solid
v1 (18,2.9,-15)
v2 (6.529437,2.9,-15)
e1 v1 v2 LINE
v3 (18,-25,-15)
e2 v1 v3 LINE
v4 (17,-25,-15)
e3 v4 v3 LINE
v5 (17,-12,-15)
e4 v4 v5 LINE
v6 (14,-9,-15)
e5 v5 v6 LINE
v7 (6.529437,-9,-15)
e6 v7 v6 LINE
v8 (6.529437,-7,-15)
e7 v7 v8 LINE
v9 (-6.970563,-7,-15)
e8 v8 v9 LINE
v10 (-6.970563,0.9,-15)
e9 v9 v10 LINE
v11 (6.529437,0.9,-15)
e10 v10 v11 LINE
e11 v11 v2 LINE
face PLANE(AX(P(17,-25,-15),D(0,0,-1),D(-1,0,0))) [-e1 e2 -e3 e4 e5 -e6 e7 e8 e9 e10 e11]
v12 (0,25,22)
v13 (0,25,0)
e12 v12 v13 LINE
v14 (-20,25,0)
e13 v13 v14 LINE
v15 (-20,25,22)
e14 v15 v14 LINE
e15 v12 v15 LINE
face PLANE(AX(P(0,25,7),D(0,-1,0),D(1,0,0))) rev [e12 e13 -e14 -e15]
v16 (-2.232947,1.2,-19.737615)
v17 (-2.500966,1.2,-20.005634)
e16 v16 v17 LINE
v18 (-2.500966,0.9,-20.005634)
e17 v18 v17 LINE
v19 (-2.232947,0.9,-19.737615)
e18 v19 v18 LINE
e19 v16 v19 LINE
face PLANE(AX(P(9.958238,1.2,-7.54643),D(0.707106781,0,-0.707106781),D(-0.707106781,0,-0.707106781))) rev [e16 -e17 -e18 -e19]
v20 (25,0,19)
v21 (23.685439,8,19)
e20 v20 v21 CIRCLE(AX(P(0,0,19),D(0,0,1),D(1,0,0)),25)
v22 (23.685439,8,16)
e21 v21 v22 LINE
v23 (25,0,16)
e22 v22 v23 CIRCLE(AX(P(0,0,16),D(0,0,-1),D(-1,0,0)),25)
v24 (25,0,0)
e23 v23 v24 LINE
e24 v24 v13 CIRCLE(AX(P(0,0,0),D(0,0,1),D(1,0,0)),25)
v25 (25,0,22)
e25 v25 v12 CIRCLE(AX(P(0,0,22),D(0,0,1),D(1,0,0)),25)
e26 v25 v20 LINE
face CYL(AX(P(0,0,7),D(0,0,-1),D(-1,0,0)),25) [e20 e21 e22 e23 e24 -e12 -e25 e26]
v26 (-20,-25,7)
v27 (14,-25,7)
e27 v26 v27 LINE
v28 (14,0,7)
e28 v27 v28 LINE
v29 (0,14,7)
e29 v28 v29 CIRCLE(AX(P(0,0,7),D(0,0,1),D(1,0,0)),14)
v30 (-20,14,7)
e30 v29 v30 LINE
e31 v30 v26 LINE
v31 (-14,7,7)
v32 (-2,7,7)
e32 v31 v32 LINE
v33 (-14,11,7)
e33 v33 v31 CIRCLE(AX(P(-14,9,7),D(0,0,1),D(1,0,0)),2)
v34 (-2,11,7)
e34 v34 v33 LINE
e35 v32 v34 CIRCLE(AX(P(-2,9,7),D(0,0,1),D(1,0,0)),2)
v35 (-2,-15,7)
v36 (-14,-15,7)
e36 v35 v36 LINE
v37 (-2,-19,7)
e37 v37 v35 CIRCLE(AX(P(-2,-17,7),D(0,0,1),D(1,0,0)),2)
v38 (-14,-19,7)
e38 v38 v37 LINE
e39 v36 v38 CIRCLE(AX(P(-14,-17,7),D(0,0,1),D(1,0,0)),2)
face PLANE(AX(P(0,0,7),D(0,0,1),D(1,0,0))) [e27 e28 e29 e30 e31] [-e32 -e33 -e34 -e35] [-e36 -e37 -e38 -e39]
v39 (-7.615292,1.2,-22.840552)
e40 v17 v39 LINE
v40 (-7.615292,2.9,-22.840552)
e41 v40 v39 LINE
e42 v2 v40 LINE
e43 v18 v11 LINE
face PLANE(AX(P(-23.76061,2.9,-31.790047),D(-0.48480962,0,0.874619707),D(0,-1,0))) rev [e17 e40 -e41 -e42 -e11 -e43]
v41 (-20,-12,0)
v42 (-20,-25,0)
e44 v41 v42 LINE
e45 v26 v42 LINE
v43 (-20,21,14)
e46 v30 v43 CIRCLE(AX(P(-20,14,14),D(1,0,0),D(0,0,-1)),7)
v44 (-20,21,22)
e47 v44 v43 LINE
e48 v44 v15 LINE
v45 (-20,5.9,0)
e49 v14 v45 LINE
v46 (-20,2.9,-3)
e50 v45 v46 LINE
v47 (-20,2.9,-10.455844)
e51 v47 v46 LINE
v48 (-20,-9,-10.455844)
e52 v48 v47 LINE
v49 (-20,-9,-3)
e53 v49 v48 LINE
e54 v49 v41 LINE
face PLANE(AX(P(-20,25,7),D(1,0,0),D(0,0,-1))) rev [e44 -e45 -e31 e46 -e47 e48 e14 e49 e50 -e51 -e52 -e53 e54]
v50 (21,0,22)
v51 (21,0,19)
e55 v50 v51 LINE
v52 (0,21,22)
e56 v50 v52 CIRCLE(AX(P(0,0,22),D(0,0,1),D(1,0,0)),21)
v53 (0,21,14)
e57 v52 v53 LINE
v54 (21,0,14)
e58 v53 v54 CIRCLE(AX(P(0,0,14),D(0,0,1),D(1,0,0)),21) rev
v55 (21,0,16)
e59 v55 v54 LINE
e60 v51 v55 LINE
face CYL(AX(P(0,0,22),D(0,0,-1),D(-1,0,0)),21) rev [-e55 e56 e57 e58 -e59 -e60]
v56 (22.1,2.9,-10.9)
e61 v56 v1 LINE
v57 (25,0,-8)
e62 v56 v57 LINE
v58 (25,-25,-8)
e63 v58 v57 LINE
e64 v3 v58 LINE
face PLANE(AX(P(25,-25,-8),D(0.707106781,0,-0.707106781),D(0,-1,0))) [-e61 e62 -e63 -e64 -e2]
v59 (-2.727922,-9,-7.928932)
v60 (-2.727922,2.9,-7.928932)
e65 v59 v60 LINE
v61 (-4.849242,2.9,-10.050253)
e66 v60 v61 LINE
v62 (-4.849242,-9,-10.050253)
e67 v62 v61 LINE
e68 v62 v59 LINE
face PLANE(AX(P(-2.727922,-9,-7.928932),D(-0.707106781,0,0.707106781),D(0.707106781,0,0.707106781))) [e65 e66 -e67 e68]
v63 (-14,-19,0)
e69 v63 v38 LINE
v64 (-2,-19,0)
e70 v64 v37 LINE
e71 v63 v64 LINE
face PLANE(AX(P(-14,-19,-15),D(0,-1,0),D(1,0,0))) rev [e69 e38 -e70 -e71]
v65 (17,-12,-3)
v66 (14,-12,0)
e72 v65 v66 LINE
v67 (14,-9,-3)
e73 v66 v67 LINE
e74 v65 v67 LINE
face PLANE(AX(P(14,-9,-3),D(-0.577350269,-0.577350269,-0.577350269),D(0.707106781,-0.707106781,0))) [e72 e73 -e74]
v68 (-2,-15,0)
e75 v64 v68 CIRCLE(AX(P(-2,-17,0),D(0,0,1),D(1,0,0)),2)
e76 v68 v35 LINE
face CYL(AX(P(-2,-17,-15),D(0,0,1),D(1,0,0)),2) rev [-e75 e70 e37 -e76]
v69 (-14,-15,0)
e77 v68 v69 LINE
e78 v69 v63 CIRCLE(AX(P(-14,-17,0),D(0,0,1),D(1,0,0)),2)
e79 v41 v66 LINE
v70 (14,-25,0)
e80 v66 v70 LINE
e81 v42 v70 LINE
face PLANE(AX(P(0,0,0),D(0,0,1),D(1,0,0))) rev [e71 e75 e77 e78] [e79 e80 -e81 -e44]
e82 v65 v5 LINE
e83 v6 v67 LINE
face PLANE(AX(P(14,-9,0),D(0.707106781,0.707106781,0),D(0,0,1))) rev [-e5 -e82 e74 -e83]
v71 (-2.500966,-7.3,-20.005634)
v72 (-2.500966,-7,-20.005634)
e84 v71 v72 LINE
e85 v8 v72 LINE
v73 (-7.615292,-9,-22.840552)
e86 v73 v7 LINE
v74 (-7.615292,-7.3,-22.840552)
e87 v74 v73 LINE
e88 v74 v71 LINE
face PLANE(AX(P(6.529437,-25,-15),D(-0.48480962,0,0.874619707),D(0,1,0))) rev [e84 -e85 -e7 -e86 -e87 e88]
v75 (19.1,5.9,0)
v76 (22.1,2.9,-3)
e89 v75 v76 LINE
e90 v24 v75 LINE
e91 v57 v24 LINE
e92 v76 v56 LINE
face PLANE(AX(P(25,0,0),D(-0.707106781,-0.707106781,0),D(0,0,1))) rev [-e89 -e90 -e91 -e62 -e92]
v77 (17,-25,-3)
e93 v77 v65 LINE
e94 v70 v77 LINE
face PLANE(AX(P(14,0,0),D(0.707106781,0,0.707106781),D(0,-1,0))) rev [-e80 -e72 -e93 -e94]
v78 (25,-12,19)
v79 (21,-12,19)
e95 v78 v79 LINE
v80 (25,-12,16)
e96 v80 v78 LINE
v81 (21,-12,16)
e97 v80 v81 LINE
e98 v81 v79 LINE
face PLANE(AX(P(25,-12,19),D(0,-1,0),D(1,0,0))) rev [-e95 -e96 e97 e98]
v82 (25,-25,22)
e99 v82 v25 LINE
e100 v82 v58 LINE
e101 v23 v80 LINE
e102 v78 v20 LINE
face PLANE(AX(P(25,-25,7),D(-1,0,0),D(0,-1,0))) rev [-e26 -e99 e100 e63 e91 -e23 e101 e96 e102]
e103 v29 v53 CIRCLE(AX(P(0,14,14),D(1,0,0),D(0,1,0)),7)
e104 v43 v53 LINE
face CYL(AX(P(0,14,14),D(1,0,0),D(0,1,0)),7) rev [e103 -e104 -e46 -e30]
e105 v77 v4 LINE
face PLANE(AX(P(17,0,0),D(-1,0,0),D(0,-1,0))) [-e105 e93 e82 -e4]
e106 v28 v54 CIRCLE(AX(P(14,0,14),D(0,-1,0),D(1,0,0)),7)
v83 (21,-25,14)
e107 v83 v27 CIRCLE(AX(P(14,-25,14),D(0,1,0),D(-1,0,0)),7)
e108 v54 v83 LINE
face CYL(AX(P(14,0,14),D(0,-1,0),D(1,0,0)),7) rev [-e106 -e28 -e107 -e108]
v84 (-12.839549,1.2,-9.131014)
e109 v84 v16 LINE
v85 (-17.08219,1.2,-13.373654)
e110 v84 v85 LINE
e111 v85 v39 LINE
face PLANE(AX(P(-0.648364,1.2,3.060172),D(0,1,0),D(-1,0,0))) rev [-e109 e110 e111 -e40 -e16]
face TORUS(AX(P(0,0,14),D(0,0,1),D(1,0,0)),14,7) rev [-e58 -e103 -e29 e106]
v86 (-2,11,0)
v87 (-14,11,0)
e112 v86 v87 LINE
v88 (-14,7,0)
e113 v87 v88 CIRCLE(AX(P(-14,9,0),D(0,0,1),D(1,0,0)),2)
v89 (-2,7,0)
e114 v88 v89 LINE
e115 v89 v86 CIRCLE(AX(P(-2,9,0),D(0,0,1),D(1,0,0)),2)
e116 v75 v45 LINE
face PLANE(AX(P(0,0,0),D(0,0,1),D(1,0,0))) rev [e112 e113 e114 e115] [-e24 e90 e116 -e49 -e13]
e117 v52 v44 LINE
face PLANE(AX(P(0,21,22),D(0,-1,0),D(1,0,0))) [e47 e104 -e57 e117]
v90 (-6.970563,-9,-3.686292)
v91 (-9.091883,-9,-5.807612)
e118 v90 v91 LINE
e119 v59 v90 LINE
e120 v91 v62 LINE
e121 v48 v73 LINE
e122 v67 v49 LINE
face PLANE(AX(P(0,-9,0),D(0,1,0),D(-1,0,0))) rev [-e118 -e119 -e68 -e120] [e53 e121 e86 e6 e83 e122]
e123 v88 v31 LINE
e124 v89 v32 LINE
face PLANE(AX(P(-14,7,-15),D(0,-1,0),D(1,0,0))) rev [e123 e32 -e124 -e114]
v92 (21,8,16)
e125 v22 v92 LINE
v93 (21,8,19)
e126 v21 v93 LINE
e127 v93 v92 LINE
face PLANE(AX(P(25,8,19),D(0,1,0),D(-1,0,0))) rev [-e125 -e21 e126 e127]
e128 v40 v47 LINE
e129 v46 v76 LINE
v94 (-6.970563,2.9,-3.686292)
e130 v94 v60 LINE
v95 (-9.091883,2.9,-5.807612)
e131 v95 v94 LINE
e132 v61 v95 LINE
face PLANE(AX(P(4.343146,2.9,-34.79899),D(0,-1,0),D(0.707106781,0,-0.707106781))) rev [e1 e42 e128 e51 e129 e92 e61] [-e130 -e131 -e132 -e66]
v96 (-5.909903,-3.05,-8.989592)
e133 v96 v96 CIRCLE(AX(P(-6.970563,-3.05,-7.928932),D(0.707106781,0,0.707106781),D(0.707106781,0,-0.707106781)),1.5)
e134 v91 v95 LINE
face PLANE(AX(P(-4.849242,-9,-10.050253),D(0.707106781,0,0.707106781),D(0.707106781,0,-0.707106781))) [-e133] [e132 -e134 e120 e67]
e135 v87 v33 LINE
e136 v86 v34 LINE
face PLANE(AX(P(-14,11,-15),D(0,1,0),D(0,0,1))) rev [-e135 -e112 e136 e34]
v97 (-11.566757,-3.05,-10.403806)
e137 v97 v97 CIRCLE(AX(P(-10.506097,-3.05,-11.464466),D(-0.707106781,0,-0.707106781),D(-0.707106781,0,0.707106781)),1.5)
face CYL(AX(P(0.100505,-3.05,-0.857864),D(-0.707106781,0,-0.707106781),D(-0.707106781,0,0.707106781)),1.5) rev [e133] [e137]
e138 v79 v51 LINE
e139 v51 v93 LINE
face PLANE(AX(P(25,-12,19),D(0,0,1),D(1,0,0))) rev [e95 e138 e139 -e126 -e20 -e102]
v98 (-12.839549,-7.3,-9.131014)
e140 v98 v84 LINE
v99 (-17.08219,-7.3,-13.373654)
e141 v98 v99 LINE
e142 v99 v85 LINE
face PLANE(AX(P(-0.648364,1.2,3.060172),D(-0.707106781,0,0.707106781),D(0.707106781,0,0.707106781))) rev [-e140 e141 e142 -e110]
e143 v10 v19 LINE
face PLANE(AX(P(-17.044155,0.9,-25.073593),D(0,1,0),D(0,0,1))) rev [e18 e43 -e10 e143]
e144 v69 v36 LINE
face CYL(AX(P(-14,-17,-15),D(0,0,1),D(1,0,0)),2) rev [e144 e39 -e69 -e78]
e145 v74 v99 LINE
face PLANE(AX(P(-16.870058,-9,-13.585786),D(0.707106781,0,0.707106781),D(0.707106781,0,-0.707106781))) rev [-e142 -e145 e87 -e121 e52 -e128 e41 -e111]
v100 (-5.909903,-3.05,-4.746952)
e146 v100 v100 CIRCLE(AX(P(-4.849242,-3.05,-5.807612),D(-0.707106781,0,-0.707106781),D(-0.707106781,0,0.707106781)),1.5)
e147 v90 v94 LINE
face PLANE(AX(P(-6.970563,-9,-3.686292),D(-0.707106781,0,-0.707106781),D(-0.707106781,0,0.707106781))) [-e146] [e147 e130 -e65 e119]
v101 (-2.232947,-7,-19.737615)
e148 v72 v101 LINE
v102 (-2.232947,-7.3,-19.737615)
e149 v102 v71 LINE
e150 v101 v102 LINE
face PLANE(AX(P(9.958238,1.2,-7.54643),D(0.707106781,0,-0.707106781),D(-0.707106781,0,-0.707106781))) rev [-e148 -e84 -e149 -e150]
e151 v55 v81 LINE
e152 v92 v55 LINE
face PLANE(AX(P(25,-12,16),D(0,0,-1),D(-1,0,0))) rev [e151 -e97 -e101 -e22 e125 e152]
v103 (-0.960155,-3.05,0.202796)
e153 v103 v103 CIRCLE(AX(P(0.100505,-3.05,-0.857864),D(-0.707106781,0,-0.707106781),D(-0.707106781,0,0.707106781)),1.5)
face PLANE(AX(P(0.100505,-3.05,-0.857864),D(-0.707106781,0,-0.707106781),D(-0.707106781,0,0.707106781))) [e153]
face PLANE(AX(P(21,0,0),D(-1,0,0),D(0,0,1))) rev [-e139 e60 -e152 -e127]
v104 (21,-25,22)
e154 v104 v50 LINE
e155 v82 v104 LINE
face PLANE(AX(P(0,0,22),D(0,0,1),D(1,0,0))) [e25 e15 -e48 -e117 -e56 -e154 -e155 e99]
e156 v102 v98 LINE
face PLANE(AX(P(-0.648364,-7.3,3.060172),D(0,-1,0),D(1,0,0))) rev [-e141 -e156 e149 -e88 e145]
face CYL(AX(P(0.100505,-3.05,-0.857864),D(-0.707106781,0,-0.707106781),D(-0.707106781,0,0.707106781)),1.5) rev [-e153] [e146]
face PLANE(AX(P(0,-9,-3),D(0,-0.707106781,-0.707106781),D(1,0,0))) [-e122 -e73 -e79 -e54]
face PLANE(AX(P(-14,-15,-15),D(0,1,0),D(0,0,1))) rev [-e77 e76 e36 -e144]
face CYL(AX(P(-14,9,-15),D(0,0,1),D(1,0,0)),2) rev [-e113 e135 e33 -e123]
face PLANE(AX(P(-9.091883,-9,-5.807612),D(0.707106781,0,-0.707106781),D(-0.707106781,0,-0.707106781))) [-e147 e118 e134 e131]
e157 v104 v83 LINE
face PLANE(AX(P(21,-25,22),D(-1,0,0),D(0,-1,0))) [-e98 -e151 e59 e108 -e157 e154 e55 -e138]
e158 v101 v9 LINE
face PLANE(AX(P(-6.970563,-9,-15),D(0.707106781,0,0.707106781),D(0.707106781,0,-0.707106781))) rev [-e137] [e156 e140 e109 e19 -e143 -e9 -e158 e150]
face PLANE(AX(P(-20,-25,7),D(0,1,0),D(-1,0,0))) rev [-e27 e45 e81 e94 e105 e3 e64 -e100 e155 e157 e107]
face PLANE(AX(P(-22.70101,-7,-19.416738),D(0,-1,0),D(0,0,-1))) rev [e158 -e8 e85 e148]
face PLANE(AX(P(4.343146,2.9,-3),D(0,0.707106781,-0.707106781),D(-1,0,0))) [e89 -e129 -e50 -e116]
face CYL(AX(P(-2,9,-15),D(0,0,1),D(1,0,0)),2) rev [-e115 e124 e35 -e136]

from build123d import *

# Parameters (mm, degrees)
BOSS_EXTRUDE1_DEPTH      = 7
EXTRUDE_THIN2_DEPTH      = 15
FILLET1_R                = 7
SKETCH5_W                = 15
SKETCH5_H                = 25
BOSS_EXTRUDE2_DEPTH      = 8
CUT_EXTRUDE2_DEPTH       = 42.641325627
LPATTERN1_COUNT          = 2
LPATTERN1_PITCH          = 26
CHAMFER3_SIZE            = 7
SKETCH9_W                = 15
SKETCH9_H                = 7
BOSS_EXTRUDE3_DEPTH      = 15
BOSS_EXTRUDE4_DEPTH      = 2
BOSS_EXTRUDE4_DEPTH_BACK = 9.9
SKETCH13_W               = 8
SKETCH13_H               = 2
BOSS_EXTRUDE6_DEPTH      = 6
CHAMFER6_SIZE            = 23.744712882
CHAMFER6_SIZE_2          = 13.5
CHAMFER7_SIZE            = 3
SKETCH14_R               = 1.5
CUT_EXTRUDE3_DEPTH       = 15
SKETCH15_W               = 15
SKETCH15_H               = 8.5
CUT_EXTRUDE4_DEPTH       = 6
CHAMFER8_SIZE            = 8
SKETCH16_W               = 3
SKETCH16_H               = 20
CUT_EXTRUDE5_DEPTH       = 54.176035971


with BuildPart() as part:
    # Sketch1 → Boss-Extrude1 (new body)
    with BuildSketch(Plane.XY):
        with BuildLine():
            Line((0, 25), (-20, 25))
            Line((-20, 25), (-20, -25))
            Line((-20, -25), (25, -25))
            Line((25, -25), (25, 0))
            ThreePointArc((25, 0), (17.67766953, 17.67766953), (0, 25))
        make_face()
    extrude(amount=BOSS_EXTRUDE1_DEPTH)

    # Sketch3 → Extrude-Thin2 (add)
    with BuildSketch(Plane.XY.offset(7)):
        with BuildLine():
            Line((25, -25), (25, 0))
            ThreePointArc((25, 0), (17.67766953, 17.67766953), (0, 25))
            Line((0, 25), (-20, 25))
            Line((-20, 25), (-20, 21))
            Line((-20, 21), (0, 21))
            ThreePointArc((0, 21), (14.849242405, 14.849242405), (21, 0))
            Line((21, 0), (21, -25))
            Line((21, -25), (25, -25))
        make_face()
    extrude(amount=EXTRUDE_THIN2_DEPTH)

    # Fillet1
    fillet1_edges = [part.edges().sort_by_distance(p)[0] for p in [
        (21, -12.5, 7),
        (14.849242405, 14.849242405, 7),
        (-10, 21, 7),
    ]]
    fillet(fillet1_edges, radius=FILLET1_R)

    # Sketch5 → Boss-Extrude2 (add)
    with BuildSketch(Plane(origin=(25, 0, 0), x_dir=(0, 0, -1), z_dir=(1, 0, 0))):
        with Locations((7.5, -12.5)):
            Rectangle(SKETCH5_W, SKETCH5_H)
    extrude(amount=-BOSS_EXTRUDE2_DEPTH)

    # Sketch8 → Cut-Extrude2 (cut, through all)
    with BuildSketch(Plane.XY.offset(7)):
        with BuildLine():
            Line((-14, -15), (-2, -15))
            ThreePointArc((-2, -15), (0, -17), (-2, -19))
            Line((-2, -19), (-14, -19))
            ThreePointArc((-14, -19), (-16, -17), (-14, -15))
        make_face()
    cut_extrude2 = extrude(amount=-CUT_EXTRUDE2_DEPTH, mode=Mode.SUBTRACT)

    # LPattern1: Cut-Extrude2 ×2
    with Locations(*[(0, i * LPATTERN1_PITCH, 0) for i in range(1, LPATTERN1_COUNT)]):
        add(cut_extrude2, mode=Mode.SUBTRACT)

    # Chamfer3
    chamfer3_edges = [part.edges().sort_by_distance(p)[0] for p in [
        (25, -12.5, -15),
    ]]
    chamfer(chamfer3_edges, length=CHAMFER3_SIZE)

    # Sketch9 → Boss-Extrude3 (add)
    with BuildSketch(Plane.ZY.offset(-17)):
        with Locations((-7.5, -3.5)):
            Rectangle(SKETCH9_W, SKETCH9_H)
    extrude(amount=BOSS_EXTRUDE3_DEPTH)

    # Sketch10 → Boss-Extrude4 (add, two sides: drawn at the far end of the back side and taken through both)
    with BuildSketch(Plane.XZ.offset(7).offset(-BOSS_EXTRUDE4_DEPTH_BACK)):
        Polygon((2, -15), (-6.970562748, -15), (-12.627416998, -9.343145751), (-16.870057685, -13.585786438), (-20, -10.455844123), (-20, 0), (17, 0), (17, -15), align=None)
        Polygon((-4.849242405, -10.050252532), (-9.091883092, -5.807611845), (-6.970562748, -3.686291501), (-2.727922061, -7.928932188), align=None, mode=Mode.SUBTRACT)
    extrude(amount=BOSS_EXTRUDE4_DEPTH + BOSS_EXTRUDE4_DEPTH_BACK)

    # Sketch13 → Boss-Extrude6 (add)
    with BuildSketch(Plane(origin=(-10.985281374, 0, -10.985281374), x_dir=(-0.7071067811865478, 0, 0.7071067811865472), z_dir=(-0.7071067811865472, 0, -0.7071067811865478))):
        with Locations((-1.67766953, 1.9)):
            Rectangle(SKETCH13_W, SKETCH13_H)
        with Locations((-1.67766953, -8)):
            Rectangle(SKETCH13_W, SKETCH13_H)
    extrude(amount=BOSS_EXTRUDE6_DEPTH)

    # Chamfer6
    # the kernel refuses this chamfer: 23.744712882, 13.5 mm, written as the material it adds along each edge
    with BuildSketch(Plane(origin=(-6.970562748, -9, -15), x_dir=(-0.7145740403020574, 0, -0.6995598194053126), z_dir=(0, 1, 0))) as chamfer6_piece_1_section:
        Polygon((CHAMFER6_SIZE * 0.999943641689, -CHAMFER6_SIZE * 0.0106166574102), (-CHAMFER6_SIZE_2 * 0.714574040302, -CHAMFER6_SIZE_2 * 0.699559819405), (0, 0), align=None)
    chamfer6_piece_1 = extrude(amount=2, mode=Mode.PRIVATE)
    chamfer6_piece_1 = split(chamfer6_piece_1, bisect_by=Plane(origin=(-9.095447466, -8, -21.360396657), z_dir=(0.7071067811865476, 0, 0.7071067811865476)), keep=Keep.TOP, mode=Mode.PRIVATE)
    add(chamfer6_piece_1)
    with BuildSketch(Plane(origin=(-6.970562748, -70.647744863, -15), x_dir=(-0.7145740403020574, 0, -0.6995598194053126), z_dir=(0, 1, 0))) as chamfer6_piece_2_section:
        Polygon((CHAMFER6_SIZE * 0.999943641689, -CHAMFER6_SIZE * 0.0106166574102), (-CHAMFER6_SIZE_2 * 0.714574040302, -CHAMFER6_SIZE_2 * 0.699559819405), (0, 0), align=None)
    chamfer6_piece_2 = extrude(amount=125.295489727, mode=Mode.PRIVATE)
    chamfer6_piece_2 = split(chamfer6_piece_2, bisect_by=Plane(origin=(-6.871868761, 2.9, -19.136817952), z_dir=(0, -1, 0)), keep=Keep.TOP, mode=Mode.PRIVATE)
    chamfer6_piece_2 = split(chamfer6_piece_2, bisect_by=Plane(origin=(-6.871868761, 0.9, -19.136817952), z_dir=(0, 1, 0)), keep=Keep.TOP, mode=Mode.PRIVATE)
    chamfer6_piece_2 = split(chamfer6_piece_2, bisect_by=Plane(origin=(-9.095447466, 1.9, -21.360396657), z_dir=(0.7071067811865476, 0, 0.7071067811865476)), keep=Keep.TOP, mode=Mode.PRIVATE)
    add(chamfer6_piece_2)
    with BuildSketch(Plane(origin=(-6.970562748, -60.747744863, -15), x_dir=(-0.7145740403020574, 0, -0.6995598194053126), z_dir=(0, 1, 0))) as chamfer6_piece_3_section:
        Polygon((CHAMFER6_SIZE * 0.999943641689, -CHAMFER6_SIZE * 0.0106166574102), (-CHAMFER6_SIZE_2 * 0.714574040302, -CHAMFER6_SIZE_2 * 0.699559819405), (0, 0), align=None)
    chamfer6_piece_3 = extrude(amount=125.295489727, mode=Mode.PRIVATE)
    chamfer6_piece_3 = split(chamfer6_piece_3, bisect_by=Plane(origin=(-6.871868761, -7, -19.136817952), z_dir=(0, -1, 0)), keep=Keep.TOP, mode=Mode.PRIVATE)
    chamfer6_piece_3 = split(chamfer6_piece_3, bisect_by=Plane(origin=(-9.095447466, -8, -21.360396657), z_dir=(0.7071067811865476, 0, 0.7071067811865476)), keep=Keep.TOP, mode=Mode.PRIVATE)
    chamfer6_piece_3 = split(chamfer6_piece_3, bisect_by=Plane(origin=(-6.871868761, -9, -19.136817952), z_dir=(0, 1, 0)), keep=Keep.TOP, mode=Mode.PRIVATE)
    add(chamfer6_piece_3)
    with BuildSketch(Plane(origin=(-6.970562748, 0.9, -15), x_dir=(-0.7145740403020574, 0, -0.6995598194053126), z_dir=(0, 1, 0))) as chamfer6_piece_4_section:
        Polygon((CHAMFER6_SIZE * 0.999943641689, -CHAMFER6_SIZE * 0.0106166574102), (-CHAMFER6_SIZE_2 * 0.714574040302, -CHAMFER6_SIZE_2 * 0.699559819405), (0, 0), align=None)
    chamfer6_piece_4 = extrude(amount=2, mode=Mode.PRIVATE)
    chamfer6_piece_4 = split(chamfer6_piece_4, bisect_by=Plane(origin=(-9.095447466, 1.9, -21.360396657), z_dir=(0.7071067811865476, 0, 0.7071067811865476)), keep=Keep.TOP, mode=Mode.PRIVATE)
    add(chamfer6_piece_4)

    # Chamfer7
    chamfer7_edges = [part.edges().sort_by_distance(p)[0] for p in [
        (-1.5, 2.9, 0),
        (17, -9, -7.5),
        (17, -17, 0),
        (-1.5, -9, 0),
    ]]
    chamfer(chamfer7_edges, length=CHAMFER7_SIZE)

    # Sketch14 → Cut-Extrude3 (cut)
    with BuildSketch(Plane(origin=(-10.985281374, 0, -10.985281374), x_dir=(-0.7071067811865478, 0, 0.7071067811865472), z_dir=(-0.7071067811865472, 0, -0.7071067811865478))):
        with Locations((-0.67766953, -3.05)):
            Circle(SKETCH14_R)
    extrude(amount=-CUT_EXTRUDE3_DEPTH, mode=Mode.SUBTRACT)

    # Sketch15 → Cut-Extrude4 (cut)
    with BuildSketch(Plane(origin=(-15.227922061, 0, -15.227922061), x_dir=(-0.7071067811865475, 0, 0.7071067811865477), z_dir=(-0.7071067811865477, 0, -0.7071067811865475))):
        with Locations((-4.87766953, -3.05)):
            Rectangle(SKETCH15_W, SKETCH15_H)
    extrude(amount=-CUT_EXTRUDE4_DEPTH, mode=Mode.SUBTRACT)

    # Chamfer8
    # the kernel refuses this chamfer: 8 mm, written as the material it adds along each edge
    with BuildSketch(Plane(origin=(17, 0, 0), x_dir=(0.9996219169112968, -0.02749587661058649, 0), z_dir=(0, 0, -1))) as chamfer8_piece_1_section:
        Polygon((CHAMFER8_SIZE * 0.999621916911, -CHAMFER8_SIZE * 0.0274958766106), (-CHAMFER8_SIZE * 0.0274958766106, -CHAMFER8_SIZE * 0.999621916911), (0, 0), align=None)
    chamfer8_piece_1 = extrude(amount=15, mode=Mode.PRIVATE)
    chamfer8_piece_1 = split(chamfer8_piece_1, bisect_by=Plane(origin=(25, 1.068527792, -2.415736104), z_dir=(-1, 0, 0)), keep=Keep.TOP, mode=Mode.PRIVATE)
    chamfer8_piece_1 = split(chamfer8_piece_1, bisect_by=Plane(origin=(20.463014023, 2.9, -2.415736104), z_dir=(0, -1, 0)), keep=Keep.TOP, mode=Mode.PRIVATE)
    chamfer8_piece_1 = split(chamfer8_piece_1, bisect_by=Plane(origin=(20.463014023, 2.276395844, -3.623604156), z_dir=(0, -0.7071067811865476, 0.7071067811865476)), keep=Keep.TOP, mode=Mode.PRIVATE)
    add(chamfer8_piece_1)
    with BuildSketch(Plane(origin=(17, 0, 20.573463904), x_dir=(0.9996219169112968, -0.02749587661058651, 0), z_dir=(0, 0, -1))) as chamfer8_piece_2_section:
        Polygon((CHAMFER8_SIZE * 0.999621916911, -CHAMFER8_SIZE * 0.0274958766106), (-CHAMFER8_SIZE * 0.0274958766106, -CHAMFER8_SIZE * 0.999621916911), (0, 0), align=None)
    chamfer8_piece_2 = extrude(amount=35.573463904, mode=Mode.PRIVATE)
    chamfer8_piece_2 = split(chamfer8_piece_2, bisect_by=Plane(origin=(17.28092154, 7.132229333, 0), z_dir=(0, 0, 1)), keep=Keep.TOP, mode=Mode.PRIVATE)
    chamfer8_piece_2 = split(chamfer8_piece_2, bisect_by=Plane(origin=(17.28092154, 6.824172, 0.924172), z_dir=(0, 0.7071067811865476, -0.7071067811865476)), keep=Keep.TOP, mode=Mode.PRIVATE)
    add(chamfer8_piece_2)
    with BuildSketch(Plane(origin=(17, 0, 0), x_dir=(0.9996219169112968, -0.02749587661058649, 0), z_dir=(0, 0, -1))) as chamfer8_piece_3_section:
        Polygon((CHAMFER8_SIZE * 0.999621916911, -CHAMFER8_SIZE * 0.0274958766106), (-CHAMFER8_SIZE * 0.0274958766106, -CHAMFER8_SIZE * 0.999621916911), (0, 0), align=None)
    chamfer8_piece_3 = extrude(amount=15, mode=Mode.PRIVATE)
    chamfer8_piece_3 = split(chamfer8_piece_3, bisect_by=Plane(origin=(19.029775324, 2.9, -1.05711343), z_dir=(0, 1, 0)), keep=Keep.TOP, mode=Mode.PRIVATE)
    chamfer8_piece_3 = split(chamfer8_piece_3, bisect_by=Plane(origin=(19.029775324, 4.314329856, -1.585670144), z_dir=(0, -0.7071067811865476, 0.7071067811865476)), keep=Keep.TOP, mode=Mode.PRIVATE)
    add(chamfer8_piece_3)
    with BuildSketch(Plane(origin=(17, 0, 0), x_dir=(0.9996219169112968, -0.02749587661058649, 0), z_dir=(0, 0, -1))) as chamfer8_piece_4_section:
        Polygon((CHAMFER8_SIZE * 0.999621916911, -CHAMFER8_SIZE * 0.0274958766106), (-CHAMFER8_SIZE * 0.0274958766106, -CHAMFER8_SIZE * 0.999621916911), (0, 0), align=None)
    chamfer8_piece_4 = extrude(amount=15, mode=Mode.PRIVATE)
    chamfer8_piece_4 = split(chamfer8_piece_4, bisect_by=Plane(origin=(21.997895662, 1.393550415, -11.002104338), z_dir=(-0.7071067811865476, 0, 0.7071067811865476)), keep=Keep.TOP, mode=Mode.PRIVATE)
    chamfer8_piece_4 = split(chamfer8_piece_4, bisect_by=Plane(origin=(25, 1.393550415, -8.795226249), z_dir=(-1, 0, 0)), keep=Keep.TOP, mode=Mode.PRIVATE)
    chamfer8_piece_4 = split(chamfer8_piece_4, bisect_by=Plane(origin=(19.791017572, 2.9, -8.795226249), z_dir=(0, -1, 0)), keep=Keep.TOP, mode=Mode.PRIVATE)
    chamfer8_piece_4 = split(chamfer8_piece_4, bisect_by=Plane(origin=(19.791017572, -0.750837917, -6.650837917), z_dir=(0, 0.7071067811865476, -0.7071067811865476)), keep=Keep.TOP, mode=Mode.PRIVATE)
    add(chamfer8_piece_4)

    # Sketch16 → Cut-Extrude5 (cut, through all)
    with BuildSketch(Plane.ZY.offset(-21)):
        with Locations((17.5, -2)):
            Rectangle(SKETCH16_W, SKETCH16_H)
    extrude(amount=-CUT_EXTRUDE5_DEPTH, mode=Mode.SUBTRACT)


solid = part.part
